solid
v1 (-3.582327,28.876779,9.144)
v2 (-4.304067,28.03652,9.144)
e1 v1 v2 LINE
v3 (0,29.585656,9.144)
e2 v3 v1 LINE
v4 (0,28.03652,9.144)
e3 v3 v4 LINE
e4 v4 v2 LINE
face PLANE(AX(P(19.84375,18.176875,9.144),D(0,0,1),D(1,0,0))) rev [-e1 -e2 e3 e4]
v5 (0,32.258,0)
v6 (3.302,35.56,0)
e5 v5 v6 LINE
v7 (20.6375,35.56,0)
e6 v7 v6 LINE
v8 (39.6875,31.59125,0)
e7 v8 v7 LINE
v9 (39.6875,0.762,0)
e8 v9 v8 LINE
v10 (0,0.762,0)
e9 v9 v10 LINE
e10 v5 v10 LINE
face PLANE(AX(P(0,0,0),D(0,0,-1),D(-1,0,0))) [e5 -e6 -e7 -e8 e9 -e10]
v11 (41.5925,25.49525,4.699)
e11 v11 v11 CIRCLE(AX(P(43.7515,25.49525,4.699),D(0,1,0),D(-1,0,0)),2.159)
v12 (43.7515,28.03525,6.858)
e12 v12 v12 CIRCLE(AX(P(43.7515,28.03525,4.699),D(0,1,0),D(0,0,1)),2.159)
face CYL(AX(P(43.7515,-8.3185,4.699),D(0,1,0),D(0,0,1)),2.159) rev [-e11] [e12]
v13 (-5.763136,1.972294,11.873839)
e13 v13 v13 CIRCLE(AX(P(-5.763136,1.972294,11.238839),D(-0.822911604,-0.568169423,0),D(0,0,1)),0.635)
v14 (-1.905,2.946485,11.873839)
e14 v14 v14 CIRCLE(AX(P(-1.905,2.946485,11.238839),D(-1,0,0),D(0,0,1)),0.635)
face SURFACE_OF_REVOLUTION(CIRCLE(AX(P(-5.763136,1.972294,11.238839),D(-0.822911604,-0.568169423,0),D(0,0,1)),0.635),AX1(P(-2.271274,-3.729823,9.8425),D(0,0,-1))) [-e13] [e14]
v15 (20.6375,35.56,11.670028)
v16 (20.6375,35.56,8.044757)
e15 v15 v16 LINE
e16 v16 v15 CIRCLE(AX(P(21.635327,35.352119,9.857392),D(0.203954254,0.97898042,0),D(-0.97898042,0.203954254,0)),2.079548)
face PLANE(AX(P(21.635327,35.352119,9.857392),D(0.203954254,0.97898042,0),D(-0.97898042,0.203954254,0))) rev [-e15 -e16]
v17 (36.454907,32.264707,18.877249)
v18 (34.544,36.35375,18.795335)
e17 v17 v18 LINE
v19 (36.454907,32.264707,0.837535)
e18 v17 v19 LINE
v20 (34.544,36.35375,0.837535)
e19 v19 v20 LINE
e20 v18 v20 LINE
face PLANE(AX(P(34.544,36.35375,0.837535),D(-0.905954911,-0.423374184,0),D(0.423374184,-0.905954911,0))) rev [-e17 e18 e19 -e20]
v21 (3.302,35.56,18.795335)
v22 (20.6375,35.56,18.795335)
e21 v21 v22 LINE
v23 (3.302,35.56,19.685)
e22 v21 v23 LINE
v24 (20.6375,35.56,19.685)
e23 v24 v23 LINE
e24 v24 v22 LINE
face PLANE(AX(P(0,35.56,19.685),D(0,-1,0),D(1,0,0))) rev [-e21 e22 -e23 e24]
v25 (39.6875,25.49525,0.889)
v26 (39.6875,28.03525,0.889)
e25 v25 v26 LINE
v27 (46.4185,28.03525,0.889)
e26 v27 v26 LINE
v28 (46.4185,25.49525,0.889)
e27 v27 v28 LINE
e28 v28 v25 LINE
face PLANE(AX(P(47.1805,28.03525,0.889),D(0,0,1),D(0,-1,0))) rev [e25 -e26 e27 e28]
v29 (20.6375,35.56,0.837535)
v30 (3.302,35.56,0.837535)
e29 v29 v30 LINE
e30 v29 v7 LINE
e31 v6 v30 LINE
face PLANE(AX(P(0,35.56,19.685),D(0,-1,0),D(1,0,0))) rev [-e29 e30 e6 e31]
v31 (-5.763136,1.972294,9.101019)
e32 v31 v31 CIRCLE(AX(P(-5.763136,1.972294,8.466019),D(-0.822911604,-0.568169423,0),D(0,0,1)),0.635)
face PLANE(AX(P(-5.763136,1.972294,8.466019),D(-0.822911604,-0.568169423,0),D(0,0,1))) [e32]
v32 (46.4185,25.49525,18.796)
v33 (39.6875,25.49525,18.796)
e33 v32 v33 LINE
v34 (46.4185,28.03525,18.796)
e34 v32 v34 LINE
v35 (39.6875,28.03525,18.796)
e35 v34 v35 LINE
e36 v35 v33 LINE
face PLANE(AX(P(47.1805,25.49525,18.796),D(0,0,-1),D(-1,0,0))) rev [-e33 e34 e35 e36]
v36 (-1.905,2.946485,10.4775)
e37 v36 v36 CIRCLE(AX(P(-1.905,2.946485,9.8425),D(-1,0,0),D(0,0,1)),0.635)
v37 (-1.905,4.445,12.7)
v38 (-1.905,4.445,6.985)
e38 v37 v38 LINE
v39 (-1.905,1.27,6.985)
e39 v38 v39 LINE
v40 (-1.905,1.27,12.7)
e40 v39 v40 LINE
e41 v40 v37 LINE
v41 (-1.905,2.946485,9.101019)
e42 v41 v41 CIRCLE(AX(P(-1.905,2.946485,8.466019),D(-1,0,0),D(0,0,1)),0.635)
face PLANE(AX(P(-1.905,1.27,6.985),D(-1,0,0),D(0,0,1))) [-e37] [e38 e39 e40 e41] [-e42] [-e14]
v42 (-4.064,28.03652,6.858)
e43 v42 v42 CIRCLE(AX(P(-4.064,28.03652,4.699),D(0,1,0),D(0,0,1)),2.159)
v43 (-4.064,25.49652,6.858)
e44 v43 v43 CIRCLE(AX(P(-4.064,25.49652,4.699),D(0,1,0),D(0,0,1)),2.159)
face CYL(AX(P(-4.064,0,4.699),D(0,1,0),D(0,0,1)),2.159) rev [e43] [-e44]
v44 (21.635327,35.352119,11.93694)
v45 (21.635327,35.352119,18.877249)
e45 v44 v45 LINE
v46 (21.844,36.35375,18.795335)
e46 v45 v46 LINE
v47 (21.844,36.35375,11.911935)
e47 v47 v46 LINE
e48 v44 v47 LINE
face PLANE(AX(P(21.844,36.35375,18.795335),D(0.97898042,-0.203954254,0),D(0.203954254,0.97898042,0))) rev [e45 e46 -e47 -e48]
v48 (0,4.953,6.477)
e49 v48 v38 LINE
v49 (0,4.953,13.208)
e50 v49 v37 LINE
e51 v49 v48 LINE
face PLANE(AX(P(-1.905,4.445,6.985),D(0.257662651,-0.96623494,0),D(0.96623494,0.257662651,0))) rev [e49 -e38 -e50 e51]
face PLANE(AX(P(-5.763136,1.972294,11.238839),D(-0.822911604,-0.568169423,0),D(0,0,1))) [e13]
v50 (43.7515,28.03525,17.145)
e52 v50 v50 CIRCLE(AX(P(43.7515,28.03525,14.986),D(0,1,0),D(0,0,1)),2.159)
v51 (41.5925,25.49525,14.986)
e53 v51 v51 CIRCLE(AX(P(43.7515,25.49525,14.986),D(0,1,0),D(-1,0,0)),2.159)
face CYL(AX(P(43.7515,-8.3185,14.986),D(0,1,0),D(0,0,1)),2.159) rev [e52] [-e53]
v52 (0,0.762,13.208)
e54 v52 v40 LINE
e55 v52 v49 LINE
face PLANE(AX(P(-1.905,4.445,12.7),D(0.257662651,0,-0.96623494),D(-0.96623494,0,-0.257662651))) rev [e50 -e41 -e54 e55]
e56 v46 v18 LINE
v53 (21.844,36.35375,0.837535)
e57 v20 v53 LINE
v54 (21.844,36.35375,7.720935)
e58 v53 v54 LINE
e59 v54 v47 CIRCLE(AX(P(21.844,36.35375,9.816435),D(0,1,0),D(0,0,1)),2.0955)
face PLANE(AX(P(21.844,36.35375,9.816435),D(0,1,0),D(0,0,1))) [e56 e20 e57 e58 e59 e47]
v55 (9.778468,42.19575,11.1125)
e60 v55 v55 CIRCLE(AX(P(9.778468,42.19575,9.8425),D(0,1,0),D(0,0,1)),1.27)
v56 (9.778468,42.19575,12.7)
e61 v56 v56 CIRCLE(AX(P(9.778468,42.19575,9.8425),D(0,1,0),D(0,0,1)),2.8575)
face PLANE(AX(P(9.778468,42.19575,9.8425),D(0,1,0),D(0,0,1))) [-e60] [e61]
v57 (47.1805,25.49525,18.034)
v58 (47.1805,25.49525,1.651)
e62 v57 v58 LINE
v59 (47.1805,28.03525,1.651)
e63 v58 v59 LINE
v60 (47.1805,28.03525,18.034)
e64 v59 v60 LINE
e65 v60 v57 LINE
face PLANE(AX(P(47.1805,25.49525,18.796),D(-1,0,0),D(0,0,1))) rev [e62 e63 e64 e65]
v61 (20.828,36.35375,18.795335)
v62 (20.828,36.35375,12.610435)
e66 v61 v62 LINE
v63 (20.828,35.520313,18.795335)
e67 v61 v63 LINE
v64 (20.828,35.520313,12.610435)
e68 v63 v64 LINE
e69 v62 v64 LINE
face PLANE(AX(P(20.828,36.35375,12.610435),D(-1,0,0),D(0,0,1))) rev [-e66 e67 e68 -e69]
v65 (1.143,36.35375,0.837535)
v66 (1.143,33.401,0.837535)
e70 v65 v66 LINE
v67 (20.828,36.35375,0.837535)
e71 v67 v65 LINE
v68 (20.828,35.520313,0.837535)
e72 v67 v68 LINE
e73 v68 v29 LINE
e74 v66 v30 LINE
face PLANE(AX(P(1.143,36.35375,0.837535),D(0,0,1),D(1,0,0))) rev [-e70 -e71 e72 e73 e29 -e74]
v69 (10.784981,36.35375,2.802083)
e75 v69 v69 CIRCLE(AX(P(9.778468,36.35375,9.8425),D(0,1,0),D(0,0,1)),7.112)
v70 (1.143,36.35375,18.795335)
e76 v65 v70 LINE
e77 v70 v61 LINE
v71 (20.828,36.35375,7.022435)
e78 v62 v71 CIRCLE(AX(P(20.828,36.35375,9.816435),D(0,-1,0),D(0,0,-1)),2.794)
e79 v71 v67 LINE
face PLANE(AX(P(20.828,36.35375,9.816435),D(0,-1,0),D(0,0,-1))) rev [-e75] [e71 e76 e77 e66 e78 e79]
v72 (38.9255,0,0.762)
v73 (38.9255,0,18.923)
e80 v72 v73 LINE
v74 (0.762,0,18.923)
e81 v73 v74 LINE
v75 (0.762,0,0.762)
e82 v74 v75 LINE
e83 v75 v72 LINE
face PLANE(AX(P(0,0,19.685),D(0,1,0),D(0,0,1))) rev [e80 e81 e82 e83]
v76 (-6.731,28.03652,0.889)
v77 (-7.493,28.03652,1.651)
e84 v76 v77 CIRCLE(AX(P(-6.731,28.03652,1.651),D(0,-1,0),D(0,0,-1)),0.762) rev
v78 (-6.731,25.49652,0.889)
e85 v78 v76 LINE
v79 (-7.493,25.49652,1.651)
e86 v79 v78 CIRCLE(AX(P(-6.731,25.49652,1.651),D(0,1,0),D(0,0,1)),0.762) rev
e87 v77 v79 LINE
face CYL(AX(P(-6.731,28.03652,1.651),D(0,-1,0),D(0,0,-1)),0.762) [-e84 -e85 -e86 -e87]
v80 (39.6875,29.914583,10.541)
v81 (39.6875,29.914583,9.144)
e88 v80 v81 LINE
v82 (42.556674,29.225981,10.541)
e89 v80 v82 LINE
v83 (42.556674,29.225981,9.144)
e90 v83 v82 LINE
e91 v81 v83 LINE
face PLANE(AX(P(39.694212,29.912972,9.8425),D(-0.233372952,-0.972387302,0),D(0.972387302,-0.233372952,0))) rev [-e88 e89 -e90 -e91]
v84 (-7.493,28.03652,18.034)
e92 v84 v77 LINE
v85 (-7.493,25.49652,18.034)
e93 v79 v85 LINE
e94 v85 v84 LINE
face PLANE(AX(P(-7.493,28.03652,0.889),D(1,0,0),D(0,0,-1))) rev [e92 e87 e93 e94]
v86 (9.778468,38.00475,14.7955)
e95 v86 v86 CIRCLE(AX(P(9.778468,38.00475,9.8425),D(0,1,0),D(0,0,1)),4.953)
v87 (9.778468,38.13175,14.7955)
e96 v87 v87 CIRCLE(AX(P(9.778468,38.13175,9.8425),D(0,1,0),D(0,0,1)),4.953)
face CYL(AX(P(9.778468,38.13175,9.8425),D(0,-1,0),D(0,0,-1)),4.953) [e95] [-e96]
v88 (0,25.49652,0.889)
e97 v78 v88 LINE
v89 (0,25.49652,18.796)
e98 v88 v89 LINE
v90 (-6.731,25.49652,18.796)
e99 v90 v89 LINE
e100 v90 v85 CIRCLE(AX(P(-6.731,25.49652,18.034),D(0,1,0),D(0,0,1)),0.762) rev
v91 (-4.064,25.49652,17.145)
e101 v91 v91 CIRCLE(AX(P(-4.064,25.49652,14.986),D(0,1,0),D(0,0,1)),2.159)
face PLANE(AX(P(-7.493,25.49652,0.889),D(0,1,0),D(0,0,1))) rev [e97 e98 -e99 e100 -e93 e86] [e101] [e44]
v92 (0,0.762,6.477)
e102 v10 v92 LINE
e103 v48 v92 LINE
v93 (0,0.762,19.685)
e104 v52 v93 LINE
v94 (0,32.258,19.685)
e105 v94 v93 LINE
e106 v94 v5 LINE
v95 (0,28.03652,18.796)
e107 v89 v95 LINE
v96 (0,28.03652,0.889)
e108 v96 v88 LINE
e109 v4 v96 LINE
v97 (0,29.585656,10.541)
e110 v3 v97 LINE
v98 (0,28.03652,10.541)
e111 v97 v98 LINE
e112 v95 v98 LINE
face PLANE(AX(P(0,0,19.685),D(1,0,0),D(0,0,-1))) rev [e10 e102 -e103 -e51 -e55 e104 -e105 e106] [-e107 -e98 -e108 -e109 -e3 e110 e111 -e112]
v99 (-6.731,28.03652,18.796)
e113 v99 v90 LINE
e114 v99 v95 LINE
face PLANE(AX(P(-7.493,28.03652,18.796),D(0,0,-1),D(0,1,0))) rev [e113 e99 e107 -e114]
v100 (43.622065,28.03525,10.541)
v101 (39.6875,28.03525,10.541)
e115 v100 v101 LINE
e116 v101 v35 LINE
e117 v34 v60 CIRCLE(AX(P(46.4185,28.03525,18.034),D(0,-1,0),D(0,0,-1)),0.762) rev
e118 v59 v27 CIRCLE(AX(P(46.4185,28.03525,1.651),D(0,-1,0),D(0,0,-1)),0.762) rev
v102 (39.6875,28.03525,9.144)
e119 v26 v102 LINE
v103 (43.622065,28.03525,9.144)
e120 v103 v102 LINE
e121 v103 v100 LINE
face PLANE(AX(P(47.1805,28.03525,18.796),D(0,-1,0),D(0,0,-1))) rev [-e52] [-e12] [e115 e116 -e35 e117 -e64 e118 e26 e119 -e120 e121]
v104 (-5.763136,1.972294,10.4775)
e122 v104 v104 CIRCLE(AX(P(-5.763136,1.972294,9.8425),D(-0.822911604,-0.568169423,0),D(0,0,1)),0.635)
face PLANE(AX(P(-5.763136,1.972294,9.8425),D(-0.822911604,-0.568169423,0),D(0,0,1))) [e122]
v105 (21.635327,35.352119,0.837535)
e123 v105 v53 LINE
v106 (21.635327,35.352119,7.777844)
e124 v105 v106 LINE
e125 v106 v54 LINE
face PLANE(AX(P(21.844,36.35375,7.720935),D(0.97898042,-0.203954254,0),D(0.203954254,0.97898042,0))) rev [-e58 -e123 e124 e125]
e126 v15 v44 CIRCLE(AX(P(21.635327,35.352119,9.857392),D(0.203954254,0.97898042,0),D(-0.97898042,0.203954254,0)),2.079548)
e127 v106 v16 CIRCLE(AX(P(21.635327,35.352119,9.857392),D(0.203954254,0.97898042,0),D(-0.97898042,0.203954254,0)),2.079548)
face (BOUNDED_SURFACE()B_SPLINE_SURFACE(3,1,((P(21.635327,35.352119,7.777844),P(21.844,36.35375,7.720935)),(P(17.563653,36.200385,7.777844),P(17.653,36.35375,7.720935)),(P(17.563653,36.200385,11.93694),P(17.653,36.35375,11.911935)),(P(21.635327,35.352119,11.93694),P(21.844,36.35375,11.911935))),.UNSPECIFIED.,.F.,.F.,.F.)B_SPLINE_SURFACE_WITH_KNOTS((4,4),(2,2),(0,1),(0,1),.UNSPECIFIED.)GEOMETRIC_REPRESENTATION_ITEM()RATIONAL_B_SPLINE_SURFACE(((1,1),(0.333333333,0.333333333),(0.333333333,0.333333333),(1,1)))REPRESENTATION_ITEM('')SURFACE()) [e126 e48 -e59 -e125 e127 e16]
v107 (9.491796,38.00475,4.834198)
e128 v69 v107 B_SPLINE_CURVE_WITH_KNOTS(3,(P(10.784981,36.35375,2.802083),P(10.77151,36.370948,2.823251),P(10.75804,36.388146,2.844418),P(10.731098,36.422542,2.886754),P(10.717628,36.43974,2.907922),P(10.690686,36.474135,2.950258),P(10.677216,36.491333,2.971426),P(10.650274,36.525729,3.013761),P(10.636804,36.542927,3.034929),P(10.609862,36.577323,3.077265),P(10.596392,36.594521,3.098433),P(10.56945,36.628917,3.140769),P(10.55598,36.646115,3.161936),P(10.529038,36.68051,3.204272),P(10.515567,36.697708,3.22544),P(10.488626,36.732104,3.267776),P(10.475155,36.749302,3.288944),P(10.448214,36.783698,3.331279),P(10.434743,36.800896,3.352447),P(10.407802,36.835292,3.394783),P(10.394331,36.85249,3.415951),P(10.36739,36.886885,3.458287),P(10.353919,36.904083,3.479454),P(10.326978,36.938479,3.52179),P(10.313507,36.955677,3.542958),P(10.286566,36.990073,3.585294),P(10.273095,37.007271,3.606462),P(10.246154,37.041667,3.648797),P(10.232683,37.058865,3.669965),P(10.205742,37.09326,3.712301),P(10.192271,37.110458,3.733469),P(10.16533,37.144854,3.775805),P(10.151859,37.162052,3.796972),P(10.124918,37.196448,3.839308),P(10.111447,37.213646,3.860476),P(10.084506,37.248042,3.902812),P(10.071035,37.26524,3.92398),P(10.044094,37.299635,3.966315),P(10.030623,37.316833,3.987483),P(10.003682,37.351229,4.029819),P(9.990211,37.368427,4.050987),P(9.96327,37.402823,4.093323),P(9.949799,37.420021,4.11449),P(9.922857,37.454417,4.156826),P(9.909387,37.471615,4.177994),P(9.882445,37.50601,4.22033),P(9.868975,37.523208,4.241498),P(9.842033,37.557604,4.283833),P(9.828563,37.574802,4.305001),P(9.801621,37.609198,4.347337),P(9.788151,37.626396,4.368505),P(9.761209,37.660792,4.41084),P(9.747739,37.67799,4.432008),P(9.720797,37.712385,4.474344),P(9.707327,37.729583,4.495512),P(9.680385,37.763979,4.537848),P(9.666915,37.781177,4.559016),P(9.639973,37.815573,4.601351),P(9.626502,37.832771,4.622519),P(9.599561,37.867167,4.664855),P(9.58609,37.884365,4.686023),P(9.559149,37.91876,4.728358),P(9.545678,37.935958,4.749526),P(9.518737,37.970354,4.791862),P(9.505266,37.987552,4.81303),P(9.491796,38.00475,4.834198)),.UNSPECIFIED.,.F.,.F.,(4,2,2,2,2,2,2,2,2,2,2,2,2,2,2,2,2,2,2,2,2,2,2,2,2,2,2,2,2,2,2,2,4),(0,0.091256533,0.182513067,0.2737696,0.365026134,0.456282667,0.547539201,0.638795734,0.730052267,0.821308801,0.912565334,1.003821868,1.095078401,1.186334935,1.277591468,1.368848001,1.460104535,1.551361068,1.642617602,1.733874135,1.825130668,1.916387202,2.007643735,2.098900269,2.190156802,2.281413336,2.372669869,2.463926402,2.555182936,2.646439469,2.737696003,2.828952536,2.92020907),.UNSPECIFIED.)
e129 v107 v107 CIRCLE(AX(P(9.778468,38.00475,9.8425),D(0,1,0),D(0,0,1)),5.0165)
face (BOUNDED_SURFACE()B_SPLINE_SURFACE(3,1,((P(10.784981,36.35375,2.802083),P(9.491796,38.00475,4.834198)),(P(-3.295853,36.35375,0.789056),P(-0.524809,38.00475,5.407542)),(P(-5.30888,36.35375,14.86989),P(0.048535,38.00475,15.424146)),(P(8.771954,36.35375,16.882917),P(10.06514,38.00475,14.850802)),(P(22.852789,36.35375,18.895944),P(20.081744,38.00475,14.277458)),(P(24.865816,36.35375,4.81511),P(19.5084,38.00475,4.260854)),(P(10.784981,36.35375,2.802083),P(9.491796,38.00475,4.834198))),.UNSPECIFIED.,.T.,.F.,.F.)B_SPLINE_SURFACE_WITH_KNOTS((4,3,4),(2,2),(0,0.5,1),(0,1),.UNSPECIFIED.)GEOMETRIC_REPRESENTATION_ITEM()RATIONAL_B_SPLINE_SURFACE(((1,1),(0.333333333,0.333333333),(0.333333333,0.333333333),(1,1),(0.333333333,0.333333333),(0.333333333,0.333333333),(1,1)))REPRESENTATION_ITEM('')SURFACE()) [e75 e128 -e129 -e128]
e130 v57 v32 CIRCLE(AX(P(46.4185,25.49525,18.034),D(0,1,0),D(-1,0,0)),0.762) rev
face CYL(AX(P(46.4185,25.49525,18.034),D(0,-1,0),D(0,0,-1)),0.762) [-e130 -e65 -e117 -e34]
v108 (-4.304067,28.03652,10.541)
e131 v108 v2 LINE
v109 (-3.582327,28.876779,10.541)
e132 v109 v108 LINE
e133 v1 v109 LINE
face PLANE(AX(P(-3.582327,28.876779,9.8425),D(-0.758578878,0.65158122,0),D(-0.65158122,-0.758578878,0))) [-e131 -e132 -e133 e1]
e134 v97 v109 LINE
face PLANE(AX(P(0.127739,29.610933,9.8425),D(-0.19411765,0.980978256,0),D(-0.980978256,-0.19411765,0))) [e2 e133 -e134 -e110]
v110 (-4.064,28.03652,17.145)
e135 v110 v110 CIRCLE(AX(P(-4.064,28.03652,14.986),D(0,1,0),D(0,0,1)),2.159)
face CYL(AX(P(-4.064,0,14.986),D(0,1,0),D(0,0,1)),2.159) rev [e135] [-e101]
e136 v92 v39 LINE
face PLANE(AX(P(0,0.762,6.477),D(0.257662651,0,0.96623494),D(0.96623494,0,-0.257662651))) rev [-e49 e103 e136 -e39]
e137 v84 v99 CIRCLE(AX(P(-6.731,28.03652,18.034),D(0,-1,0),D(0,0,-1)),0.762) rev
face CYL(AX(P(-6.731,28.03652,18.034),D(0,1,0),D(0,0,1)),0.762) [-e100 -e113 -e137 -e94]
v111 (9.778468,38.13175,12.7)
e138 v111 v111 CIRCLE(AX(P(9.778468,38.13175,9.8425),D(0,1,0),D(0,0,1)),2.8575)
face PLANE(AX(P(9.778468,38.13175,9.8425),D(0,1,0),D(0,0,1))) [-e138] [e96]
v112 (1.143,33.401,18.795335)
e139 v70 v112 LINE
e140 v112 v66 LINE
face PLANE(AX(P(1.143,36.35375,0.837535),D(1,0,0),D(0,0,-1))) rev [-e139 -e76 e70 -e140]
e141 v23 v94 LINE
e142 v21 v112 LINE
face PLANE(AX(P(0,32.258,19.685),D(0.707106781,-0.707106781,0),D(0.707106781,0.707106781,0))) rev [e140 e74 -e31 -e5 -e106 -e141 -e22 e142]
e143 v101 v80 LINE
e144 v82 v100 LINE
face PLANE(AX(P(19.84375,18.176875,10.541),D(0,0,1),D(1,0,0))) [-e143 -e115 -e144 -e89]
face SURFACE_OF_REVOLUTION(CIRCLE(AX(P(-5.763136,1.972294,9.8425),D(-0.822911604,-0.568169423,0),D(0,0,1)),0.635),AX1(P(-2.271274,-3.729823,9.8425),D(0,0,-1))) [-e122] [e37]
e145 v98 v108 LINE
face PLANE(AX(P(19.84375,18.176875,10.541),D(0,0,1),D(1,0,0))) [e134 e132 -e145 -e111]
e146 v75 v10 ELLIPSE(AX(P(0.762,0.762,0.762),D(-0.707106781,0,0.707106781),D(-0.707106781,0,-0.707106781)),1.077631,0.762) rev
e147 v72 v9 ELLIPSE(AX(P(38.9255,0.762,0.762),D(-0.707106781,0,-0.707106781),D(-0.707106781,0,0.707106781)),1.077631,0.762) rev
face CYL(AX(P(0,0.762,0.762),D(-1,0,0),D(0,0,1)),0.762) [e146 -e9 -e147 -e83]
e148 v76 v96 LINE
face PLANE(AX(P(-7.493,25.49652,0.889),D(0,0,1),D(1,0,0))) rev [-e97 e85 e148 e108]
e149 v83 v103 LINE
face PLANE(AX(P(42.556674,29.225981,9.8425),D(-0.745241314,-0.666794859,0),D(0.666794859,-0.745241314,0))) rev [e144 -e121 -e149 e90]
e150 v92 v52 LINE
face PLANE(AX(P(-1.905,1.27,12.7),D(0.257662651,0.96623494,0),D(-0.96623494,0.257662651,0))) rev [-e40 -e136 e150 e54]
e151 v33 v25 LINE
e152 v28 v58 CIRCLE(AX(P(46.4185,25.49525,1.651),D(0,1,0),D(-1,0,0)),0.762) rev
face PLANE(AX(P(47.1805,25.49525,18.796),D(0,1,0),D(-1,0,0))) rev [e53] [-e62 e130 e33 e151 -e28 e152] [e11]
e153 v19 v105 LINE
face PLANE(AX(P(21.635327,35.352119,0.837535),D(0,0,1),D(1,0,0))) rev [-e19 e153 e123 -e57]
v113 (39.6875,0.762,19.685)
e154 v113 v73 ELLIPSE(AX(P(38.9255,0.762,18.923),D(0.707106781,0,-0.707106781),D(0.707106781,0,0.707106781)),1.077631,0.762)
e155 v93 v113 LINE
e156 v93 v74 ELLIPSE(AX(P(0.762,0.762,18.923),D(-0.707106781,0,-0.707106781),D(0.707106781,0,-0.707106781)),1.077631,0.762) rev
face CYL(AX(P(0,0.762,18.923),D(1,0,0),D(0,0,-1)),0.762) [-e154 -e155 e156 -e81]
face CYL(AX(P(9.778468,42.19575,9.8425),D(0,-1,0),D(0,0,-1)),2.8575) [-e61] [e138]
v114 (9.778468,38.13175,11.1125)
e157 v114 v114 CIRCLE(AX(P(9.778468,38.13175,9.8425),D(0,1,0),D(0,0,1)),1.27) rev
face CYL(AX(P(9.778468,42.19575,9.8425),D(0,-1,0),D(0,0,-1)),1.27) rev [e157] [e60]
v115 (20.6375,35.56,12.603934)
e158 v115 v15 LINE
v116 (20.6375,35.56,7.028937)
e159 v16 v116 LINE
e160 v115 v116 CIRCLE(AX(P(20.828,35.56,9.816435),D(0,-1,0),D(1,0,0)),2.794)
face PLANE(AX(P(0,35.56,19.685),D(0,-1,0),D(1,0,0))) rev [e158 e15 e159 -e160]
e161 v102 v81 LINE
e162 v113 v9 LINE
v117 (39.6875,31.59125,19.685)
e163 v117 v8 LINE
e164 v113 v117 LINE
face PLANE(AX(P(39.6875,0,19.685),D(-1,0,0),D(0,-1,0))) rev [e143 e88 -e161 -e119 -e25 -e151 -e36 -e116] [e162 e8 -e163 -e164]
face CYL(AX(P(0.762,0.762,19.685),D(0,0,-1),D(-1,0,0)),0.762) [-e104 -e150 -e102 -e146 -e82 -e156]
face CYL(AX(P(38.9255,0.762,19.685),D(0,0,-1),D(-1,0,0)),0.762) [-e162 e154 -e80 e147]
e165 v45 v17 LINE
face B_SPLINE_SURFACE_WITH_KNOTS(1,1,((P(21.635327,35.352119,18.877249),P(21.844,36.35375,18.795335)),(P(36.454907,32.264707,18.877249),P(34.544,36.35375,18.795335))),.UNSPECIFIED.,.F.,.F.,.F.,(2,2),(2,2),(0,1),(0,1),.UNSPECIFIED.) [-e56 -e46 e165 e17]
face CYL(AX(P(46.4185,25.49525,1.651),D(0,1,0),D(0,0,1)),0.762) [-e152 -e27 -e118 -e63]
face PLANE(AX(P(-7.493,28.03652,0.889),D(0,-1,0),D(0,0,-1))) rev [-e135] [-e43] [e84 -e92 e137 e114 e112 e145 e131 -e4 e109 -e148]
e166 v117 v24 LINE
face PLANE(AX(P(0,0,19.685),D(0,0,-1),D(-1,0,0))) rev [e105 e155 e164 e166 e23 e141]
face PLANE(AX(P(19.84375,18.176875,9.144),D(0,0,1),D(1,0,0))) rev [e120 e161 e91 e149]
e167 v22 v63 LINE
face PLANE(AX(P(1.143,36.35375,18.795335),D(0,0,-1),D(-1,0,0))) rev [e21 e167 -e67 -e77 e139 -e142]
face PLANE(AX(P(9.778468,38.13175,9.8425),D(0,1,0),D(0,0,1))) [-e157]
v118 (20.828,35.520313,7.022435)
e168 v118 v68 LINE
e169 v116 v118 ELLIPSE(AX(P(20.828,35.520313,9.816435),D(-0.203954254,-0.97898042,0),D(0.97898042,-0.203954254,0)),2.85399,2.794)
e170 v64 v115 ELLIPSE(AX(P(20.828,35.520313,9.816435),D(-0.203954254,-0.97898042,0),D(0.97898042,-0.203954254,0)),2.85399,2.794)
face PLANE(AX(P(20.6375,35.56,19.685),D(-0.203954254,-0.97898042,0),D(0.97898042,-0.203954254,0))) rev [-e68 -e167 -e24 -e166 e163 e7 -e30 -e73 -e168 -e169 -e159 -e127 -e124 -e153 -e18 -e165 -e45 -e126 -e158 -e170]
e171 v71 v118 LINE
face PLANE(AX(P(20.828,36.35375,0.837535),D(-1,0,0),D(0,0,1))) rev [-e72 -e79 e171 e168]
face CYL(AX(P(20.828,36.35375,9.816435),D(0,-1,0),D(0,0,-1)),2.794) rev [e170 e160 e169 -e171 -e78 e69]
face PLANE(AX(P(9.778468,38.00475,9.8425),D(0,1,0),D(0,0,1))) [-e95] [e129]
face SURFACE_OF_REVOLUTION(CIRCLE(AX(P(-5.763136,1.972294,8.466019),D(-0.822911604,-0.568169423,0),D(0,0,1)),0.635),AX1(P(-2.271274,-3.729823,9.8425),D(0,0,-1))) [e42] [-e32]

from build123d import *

# Parameters (mm, degrees)
EXTRUDE1_DEPTH     = 19.685
CHAMFER1_SIZE      = 3.302
FILLET1_R          = 0.762
SKETCH2_W          = 17.907
SKETCH2_H          = 2.54
EXTRUDE2_DEPTH     = 7.493
SKETCH4_W          = 17.907
SKETCH4_H          = 2.54
EXTRUDE3_DEPTH     = 7.493
FILLET2_R          = 0.762
EXTRUDE4_DEPTH     = 36.35375
SKETCH10_R         = 2.159
CUT_EXTRUDE1_DEPTH = 36.35375
RIB2_START         = -0.6985
RIB2_DEPTH         = 1.397
RIB3_START         = -0.6985
RIB3_DEPTH         = 1.397
SKETCH16_R         = 5.0165
EXTRUDE5_DEPTH     = 1.651
SKETCH18_R         = 4.953
EXTRUDE6_DEPTH     = 0.127
SKETCH19_R         = 2.159
CUT_EXTRUDE2_DEPTH = 59.305619446
SKETCH20_R         = 2.8575
SKETCH20_R_2       = 1.27
EXTRUDE7_DEPTH     = 4.064
SKETCH22_W         = 5.715
SKETCH22_H         = 3.175
EXTRUDE8_DEPTH     = 1.905
SKETCH24_R         = 0.635


with BuildPart() as part:
    # Sketch1 → Extrude1 (new body)
    with BuildSketch(Plane.XY):
        Polygon((0, 0), (39.6875, 0), (39.6875, 31.59125), (20.6375, 35.56), (0, 35.56), align=None)
    extrude(amount=EXTRUDE1_DEPTH)

    # Chamfer1
    chamfer1_edges = [part.edges().sort_by_distance(p)[0] for p in [
        (0, 35.56, 9.8425),
    ]]
    chamfer(chamfer1_edges, length=CHAMFER1_SIZE)

    # Fillet1
    fillet1_edges = [part.edges().sort_by_distance(p)[0] for p in [
        (19.84375, 0, 0),
        (19.84375, 0, 19.685),
        (39.6875, 0, 9.8425),
        (0, 0, 9.8425),
    ]]
    fillet(fillet1_edges, radius=FILLET1_R)

    # Sketch2 → Extrude2 (add)
    with BuildSketch(Plane(origin=(39.6875, 0, 0), x_dir=(0, 0, -1), z_dir=(1, 0, 0))):
        with Locations((-9.8425, 26.76525)):
            Rectangle(SKETCH2_W, SKETCH2_H)
    extrude(amount=EXTRUDE2_DEPTH)

    # Sketch4 → Extrude3 (add)
    with BuildSketch(Plane.ZY):
        with Locations((9.8425, 26.76652)):
            Rectangle(SKETCH4_W, SKETCH4_H)
    extrude(amount=EXTRUDE3_DEPTH)

    # Fillet2
    fillet2_edges = [part.edges().sort_by_distance(p)[0] for p in [
        (47.1805, 26.76525, 18.796),
        (47.1805, 26.76525, 0.889),
        (-7.493, 26.76652, 0.889),
        (-7.493, 26.76652, 18.796),
    ]]
    fillet(fillet2_edges, radius=FILLET2_R)

    # Sketch5 → Extrude4 (add)
    with BuildSketch(Plane(origin=(0, 0, 0), x_dir=(1, 0, 0), z_dir=(0, 1, 0))):
        with BuildLine():
            Line((1.143, -0.837535442), (20.828, -0.837535442))
            Line((20.828, -0.837535442), (20.828, -7.022435442))
            ThreePointArc((20.828, -7.022435442), (18.034, -9.816435442), (20.828, -12.610435442))
            Line((20.828, -12.610435442), (20.828, -18.795335442))
            Line((20.828, -18.795335442), (1.143, -18.795335442))
            Line((1.143, -18.795335442), (1.143, -0.837535442))
        make_face()
    extrude(amount=EXTRUDE4_DEPTH)

    # Sketch9 → Loft1 section 0
    with BuildSketch(Plane(origin=(7.958631448, 38.201430948, 0), x_dir=(-0.9789804197376049, 0.20395425411200233, 0), z_dir=(0.20395425411200233, 0.9789804197376049, 0))):
        with BuildLine():
            Line((-29.108115578, 18.877249077), (-13.970346323, 18.877249077))
            Line((-13.970346323, 18.877249077), (-13.970346323, 11.936940395))
            ThreePointArc((-13.970346323, 11.936940395), (-11.890798187, 9.857392259), (-13.970346323, 7.777844123))
            Line((-13.970346323, 7.777844123), (-13.970346323, 0.837535442))
            Line((-13.970346323, 0.837535442), (-29.108115578, 0.837535442))
            Line((-29.108115578, 0.837535442), (-29.108115578, 18.877249077))
        make_face()
    # Sketch7 → Loft1 section 1
    with BuildSketch(Plane(origin=(0, 36.35375, 0), x_dir=(-1, 0, 0), z_dir=(0, 1, 0))):
        with BuildLine():
            Line((-21.844, 0.837535442), (-34.544, 0.837535442))
            Line((-34.544, 0.837535442), (-34.544, 18.795335442))
            Line((-34.544, 18.795335442), (-21.844, 18.795335442))
            Line((-21.844, 18.795335442), (-21.844, 11.911935442))
            ThreePointArc((-21.844, 11.911935442), (-19.7485, 9.816435442), (-21.844, 7.720935442))
            Line((-21.844, 7.720935442), (-21.844, 0.837535442))
        make_face()
    loft()

    # Sketch10 → Cut-Extrude1 (cut)
    with BuildSketch(Plane(origin=(0, 28.03525, 0), x_dir=(-1, 0, 0), z_dir=(0, 1, 0))):
        with Locations(Location((-43.7515, 4.699, 0), (0, 0, 90))):
            Circle(SKETCH10_R)
        with Locations(Location((-43.7515, 14.986, 0), (0, 0, 90))):
            Circle(SKETCH10_R)
    extrude(amount=-CUT_EXTRUDE1_DEPTH, mode=Mode.SUBTRACT)

    # Rib2: read off the stored shape, not the designer's step
    # Rib2 outline → Rib2 (add)
    with BuildSketch(Plane.XY.offset(9.8425).offset(RIB2_START)):
        Polygon((43.622065389, 28.03525), (42.556674437, 29.225981064), (39.6875, 29.914582929), (39.6875, 28.03525), align=None)
    extrude(amount=RIB2_DEPTH)

    # Rib3: read off the stored shape, not the designer's step
    # Rib3 outline → Rib3 (add)
    with BuildSketch(Plane.XY.offset(9.8425).offset(RIB3_START)):
        Polygon((0, 29.585656003), (-3.58232689, 28.876779051), (-4.304067283, 28.03652), (0, 28.03652), align=None)
    extrude(amount=RIB3_DEPTH)

    # Sketch16 → Extrude5 (add)
    with BuildSketch(Plane(origin=(0, 36.35375, 0), x_dir=(-1, 0, 0), z_dir=(0, 1, 0))):
        with Locations(Location((-9.77846774, 9.8425, 0), (0, 0, 270))):
            Circle(SKETCH16_R)
    extrude(amount=EXTRUDE5_DEPTH)

    # Loft2: read off the stored shape, not the designer's step
    # Loft2: loft between two sections, ruled curve by curve
    loft2_from = [
        Edge.make_bspline([(10.784981125, 36.35375, 2.802082768), (-3.29585334, 36.35375, 0.789055998), (-5.308880109, 36.35375, 14.869890463), (8.771954355, 36.35375, 16.882917232), (22.85278882, 36.35375, 18.895944002), (24.865815589, 36.35375, 4.815109537), (10.784981125, 36.35375, 2.802082768)], [0, 0, 0, 0, 0.5, 0.5, 0.5, 1, 1, 1, 1], 3, [1, 0.333333333, 0.333333333, 1, 0.333333333, 0.333333333, 1]),
    ]
    loft2_to = [
        Edge.make_bspline([(9.491795646, 38.00475, 4.834197757), (-0.52480884, 38.00475, 5.407541944), (0.048535347, 38.00475, 15.424146431), (10.065139834, 38.00475, 14.850802243), (20.08174432, 38.00475, 14.277458056), (19.508400133, 38.00475, 4.260853569), (9.491795646, 38.00475, 4.834197757)], [0, 0, 0, 0, 0.5, 0.5, 0.5, 1, 1, 1, 1], 3, [1, 0.333333333, 0.333333333, 1, 0.333333333, 0.333333333, 1]),
    ]
    loft2 = Solid(Shell([*[Face.make_surface_from_curves(loft2_from[k], loft2_to[k]) for k in range(1)], Face(Wire(loft2_from)), Face(Wire(loft2_to))]))
    add(loft2)

    # Sketch18 → Extrude6 (add)
    with BuildSketch(Plane(origin=(0, 38.00475, 0), x_dir=(-1, 0, 0), z_dir=(0, 1, 0))):
        with Locations(Location((-9.77846774, 9.8425, 0), (0, 0, 90))):
            Circle(SKETCH18_R)
    extrude(amount=EXTRUDE6_DEPTH)

    # Sketch19 → Cut-Extrude2 (cut, through all)
    with BuildSketch(Plane(origin=(0, 28.03652, 0), x_dir=(-1, 0, 0), z_dir=(0, 1, 0))):
        with Locations(Location((4.064, 4.699, 0), (0, 0, 90))):
            Circle(SKETCH19_R)
        with Locations(Location((4.064, 14.986, 0), (0, 0, 90))):
            Circle(SKETCH19_R)
    extrude(amount=-CUT_EXTRUDE2_DEPTH, mode=Mode.SUBTRACT)

    # Sketch20 → Extrude7 (add)
    with BuildSketch(Plane(origin=(0, 38.13175, 0), x_dir=(-1, 0, 0), z_dir=(0, 1, 0))):
        with Locations(Location((-9.77846774, 9.8425, 0), (0, 0, 90))):
            Circle(SKETCH20_R)
        with Locations(Location((-9.77846774, 9.8425, 0), (0, 0, 90))):
            Circle(SKETCH20_R_2, mode=Mode.SUBTRACT)
    extrude(amount=EXTRUDE7_DEPTH)

    # Sketch22 → Extrude8 (add)
    with BuildSketch(Plane.ZY):
        with Locations((9.8425, 2.8575)):
            Rectangle(SKETCH22_W, SKETCH22_H)
    extrude(amount=EXTRUDE8_DEPTH)

    # Sketch21 → section 0 of loft3
    with BuildSketch(Plane.ZY, mode=Mode.PRIVATE) as loft3_s0:
        with BuildLine():
            Line((6.477, 4.953), (13.208, 4.953))
            Line((13.208, 4.953), (13.208, 0.762))
            Line((13.208, 0.762), (6.477, 0.762))
            Line((6.477, 0.762), (6.477, 4.953))
        make_face()
    # loft up to a face of the part (loft3)
    loft([loft3_s0.sketch, part.faces().sort_by_distance((-1.905, 2.8575, 9.8425))[0]])

    # Sweep3: sweep along a path in Sketch23
    with BuildLine(Plane.XY.offset(9.8425)) as sweep3_path:
        ThreePointArc((-1.905, 2.946484605), (-3.908218654, 2.753050744), (-5.763136487, 1.972293764))
    # Sketch24 → Sweep3 (sweep)
    with BuildSketch(Plane.ZY.offset(1.905)):
        with Locations((9.8425, 2.946484605)):
            Circle(SKETCH24_R)
        with Locations((11.23883905, 2.946484605)):
            Circle(SKETCH24_R)
        with Locations((8.466018651, 2.946484605)):
            Circle(SKETCH24_R)
    sweep(path=sweep3_path.line)


solid = part.part
